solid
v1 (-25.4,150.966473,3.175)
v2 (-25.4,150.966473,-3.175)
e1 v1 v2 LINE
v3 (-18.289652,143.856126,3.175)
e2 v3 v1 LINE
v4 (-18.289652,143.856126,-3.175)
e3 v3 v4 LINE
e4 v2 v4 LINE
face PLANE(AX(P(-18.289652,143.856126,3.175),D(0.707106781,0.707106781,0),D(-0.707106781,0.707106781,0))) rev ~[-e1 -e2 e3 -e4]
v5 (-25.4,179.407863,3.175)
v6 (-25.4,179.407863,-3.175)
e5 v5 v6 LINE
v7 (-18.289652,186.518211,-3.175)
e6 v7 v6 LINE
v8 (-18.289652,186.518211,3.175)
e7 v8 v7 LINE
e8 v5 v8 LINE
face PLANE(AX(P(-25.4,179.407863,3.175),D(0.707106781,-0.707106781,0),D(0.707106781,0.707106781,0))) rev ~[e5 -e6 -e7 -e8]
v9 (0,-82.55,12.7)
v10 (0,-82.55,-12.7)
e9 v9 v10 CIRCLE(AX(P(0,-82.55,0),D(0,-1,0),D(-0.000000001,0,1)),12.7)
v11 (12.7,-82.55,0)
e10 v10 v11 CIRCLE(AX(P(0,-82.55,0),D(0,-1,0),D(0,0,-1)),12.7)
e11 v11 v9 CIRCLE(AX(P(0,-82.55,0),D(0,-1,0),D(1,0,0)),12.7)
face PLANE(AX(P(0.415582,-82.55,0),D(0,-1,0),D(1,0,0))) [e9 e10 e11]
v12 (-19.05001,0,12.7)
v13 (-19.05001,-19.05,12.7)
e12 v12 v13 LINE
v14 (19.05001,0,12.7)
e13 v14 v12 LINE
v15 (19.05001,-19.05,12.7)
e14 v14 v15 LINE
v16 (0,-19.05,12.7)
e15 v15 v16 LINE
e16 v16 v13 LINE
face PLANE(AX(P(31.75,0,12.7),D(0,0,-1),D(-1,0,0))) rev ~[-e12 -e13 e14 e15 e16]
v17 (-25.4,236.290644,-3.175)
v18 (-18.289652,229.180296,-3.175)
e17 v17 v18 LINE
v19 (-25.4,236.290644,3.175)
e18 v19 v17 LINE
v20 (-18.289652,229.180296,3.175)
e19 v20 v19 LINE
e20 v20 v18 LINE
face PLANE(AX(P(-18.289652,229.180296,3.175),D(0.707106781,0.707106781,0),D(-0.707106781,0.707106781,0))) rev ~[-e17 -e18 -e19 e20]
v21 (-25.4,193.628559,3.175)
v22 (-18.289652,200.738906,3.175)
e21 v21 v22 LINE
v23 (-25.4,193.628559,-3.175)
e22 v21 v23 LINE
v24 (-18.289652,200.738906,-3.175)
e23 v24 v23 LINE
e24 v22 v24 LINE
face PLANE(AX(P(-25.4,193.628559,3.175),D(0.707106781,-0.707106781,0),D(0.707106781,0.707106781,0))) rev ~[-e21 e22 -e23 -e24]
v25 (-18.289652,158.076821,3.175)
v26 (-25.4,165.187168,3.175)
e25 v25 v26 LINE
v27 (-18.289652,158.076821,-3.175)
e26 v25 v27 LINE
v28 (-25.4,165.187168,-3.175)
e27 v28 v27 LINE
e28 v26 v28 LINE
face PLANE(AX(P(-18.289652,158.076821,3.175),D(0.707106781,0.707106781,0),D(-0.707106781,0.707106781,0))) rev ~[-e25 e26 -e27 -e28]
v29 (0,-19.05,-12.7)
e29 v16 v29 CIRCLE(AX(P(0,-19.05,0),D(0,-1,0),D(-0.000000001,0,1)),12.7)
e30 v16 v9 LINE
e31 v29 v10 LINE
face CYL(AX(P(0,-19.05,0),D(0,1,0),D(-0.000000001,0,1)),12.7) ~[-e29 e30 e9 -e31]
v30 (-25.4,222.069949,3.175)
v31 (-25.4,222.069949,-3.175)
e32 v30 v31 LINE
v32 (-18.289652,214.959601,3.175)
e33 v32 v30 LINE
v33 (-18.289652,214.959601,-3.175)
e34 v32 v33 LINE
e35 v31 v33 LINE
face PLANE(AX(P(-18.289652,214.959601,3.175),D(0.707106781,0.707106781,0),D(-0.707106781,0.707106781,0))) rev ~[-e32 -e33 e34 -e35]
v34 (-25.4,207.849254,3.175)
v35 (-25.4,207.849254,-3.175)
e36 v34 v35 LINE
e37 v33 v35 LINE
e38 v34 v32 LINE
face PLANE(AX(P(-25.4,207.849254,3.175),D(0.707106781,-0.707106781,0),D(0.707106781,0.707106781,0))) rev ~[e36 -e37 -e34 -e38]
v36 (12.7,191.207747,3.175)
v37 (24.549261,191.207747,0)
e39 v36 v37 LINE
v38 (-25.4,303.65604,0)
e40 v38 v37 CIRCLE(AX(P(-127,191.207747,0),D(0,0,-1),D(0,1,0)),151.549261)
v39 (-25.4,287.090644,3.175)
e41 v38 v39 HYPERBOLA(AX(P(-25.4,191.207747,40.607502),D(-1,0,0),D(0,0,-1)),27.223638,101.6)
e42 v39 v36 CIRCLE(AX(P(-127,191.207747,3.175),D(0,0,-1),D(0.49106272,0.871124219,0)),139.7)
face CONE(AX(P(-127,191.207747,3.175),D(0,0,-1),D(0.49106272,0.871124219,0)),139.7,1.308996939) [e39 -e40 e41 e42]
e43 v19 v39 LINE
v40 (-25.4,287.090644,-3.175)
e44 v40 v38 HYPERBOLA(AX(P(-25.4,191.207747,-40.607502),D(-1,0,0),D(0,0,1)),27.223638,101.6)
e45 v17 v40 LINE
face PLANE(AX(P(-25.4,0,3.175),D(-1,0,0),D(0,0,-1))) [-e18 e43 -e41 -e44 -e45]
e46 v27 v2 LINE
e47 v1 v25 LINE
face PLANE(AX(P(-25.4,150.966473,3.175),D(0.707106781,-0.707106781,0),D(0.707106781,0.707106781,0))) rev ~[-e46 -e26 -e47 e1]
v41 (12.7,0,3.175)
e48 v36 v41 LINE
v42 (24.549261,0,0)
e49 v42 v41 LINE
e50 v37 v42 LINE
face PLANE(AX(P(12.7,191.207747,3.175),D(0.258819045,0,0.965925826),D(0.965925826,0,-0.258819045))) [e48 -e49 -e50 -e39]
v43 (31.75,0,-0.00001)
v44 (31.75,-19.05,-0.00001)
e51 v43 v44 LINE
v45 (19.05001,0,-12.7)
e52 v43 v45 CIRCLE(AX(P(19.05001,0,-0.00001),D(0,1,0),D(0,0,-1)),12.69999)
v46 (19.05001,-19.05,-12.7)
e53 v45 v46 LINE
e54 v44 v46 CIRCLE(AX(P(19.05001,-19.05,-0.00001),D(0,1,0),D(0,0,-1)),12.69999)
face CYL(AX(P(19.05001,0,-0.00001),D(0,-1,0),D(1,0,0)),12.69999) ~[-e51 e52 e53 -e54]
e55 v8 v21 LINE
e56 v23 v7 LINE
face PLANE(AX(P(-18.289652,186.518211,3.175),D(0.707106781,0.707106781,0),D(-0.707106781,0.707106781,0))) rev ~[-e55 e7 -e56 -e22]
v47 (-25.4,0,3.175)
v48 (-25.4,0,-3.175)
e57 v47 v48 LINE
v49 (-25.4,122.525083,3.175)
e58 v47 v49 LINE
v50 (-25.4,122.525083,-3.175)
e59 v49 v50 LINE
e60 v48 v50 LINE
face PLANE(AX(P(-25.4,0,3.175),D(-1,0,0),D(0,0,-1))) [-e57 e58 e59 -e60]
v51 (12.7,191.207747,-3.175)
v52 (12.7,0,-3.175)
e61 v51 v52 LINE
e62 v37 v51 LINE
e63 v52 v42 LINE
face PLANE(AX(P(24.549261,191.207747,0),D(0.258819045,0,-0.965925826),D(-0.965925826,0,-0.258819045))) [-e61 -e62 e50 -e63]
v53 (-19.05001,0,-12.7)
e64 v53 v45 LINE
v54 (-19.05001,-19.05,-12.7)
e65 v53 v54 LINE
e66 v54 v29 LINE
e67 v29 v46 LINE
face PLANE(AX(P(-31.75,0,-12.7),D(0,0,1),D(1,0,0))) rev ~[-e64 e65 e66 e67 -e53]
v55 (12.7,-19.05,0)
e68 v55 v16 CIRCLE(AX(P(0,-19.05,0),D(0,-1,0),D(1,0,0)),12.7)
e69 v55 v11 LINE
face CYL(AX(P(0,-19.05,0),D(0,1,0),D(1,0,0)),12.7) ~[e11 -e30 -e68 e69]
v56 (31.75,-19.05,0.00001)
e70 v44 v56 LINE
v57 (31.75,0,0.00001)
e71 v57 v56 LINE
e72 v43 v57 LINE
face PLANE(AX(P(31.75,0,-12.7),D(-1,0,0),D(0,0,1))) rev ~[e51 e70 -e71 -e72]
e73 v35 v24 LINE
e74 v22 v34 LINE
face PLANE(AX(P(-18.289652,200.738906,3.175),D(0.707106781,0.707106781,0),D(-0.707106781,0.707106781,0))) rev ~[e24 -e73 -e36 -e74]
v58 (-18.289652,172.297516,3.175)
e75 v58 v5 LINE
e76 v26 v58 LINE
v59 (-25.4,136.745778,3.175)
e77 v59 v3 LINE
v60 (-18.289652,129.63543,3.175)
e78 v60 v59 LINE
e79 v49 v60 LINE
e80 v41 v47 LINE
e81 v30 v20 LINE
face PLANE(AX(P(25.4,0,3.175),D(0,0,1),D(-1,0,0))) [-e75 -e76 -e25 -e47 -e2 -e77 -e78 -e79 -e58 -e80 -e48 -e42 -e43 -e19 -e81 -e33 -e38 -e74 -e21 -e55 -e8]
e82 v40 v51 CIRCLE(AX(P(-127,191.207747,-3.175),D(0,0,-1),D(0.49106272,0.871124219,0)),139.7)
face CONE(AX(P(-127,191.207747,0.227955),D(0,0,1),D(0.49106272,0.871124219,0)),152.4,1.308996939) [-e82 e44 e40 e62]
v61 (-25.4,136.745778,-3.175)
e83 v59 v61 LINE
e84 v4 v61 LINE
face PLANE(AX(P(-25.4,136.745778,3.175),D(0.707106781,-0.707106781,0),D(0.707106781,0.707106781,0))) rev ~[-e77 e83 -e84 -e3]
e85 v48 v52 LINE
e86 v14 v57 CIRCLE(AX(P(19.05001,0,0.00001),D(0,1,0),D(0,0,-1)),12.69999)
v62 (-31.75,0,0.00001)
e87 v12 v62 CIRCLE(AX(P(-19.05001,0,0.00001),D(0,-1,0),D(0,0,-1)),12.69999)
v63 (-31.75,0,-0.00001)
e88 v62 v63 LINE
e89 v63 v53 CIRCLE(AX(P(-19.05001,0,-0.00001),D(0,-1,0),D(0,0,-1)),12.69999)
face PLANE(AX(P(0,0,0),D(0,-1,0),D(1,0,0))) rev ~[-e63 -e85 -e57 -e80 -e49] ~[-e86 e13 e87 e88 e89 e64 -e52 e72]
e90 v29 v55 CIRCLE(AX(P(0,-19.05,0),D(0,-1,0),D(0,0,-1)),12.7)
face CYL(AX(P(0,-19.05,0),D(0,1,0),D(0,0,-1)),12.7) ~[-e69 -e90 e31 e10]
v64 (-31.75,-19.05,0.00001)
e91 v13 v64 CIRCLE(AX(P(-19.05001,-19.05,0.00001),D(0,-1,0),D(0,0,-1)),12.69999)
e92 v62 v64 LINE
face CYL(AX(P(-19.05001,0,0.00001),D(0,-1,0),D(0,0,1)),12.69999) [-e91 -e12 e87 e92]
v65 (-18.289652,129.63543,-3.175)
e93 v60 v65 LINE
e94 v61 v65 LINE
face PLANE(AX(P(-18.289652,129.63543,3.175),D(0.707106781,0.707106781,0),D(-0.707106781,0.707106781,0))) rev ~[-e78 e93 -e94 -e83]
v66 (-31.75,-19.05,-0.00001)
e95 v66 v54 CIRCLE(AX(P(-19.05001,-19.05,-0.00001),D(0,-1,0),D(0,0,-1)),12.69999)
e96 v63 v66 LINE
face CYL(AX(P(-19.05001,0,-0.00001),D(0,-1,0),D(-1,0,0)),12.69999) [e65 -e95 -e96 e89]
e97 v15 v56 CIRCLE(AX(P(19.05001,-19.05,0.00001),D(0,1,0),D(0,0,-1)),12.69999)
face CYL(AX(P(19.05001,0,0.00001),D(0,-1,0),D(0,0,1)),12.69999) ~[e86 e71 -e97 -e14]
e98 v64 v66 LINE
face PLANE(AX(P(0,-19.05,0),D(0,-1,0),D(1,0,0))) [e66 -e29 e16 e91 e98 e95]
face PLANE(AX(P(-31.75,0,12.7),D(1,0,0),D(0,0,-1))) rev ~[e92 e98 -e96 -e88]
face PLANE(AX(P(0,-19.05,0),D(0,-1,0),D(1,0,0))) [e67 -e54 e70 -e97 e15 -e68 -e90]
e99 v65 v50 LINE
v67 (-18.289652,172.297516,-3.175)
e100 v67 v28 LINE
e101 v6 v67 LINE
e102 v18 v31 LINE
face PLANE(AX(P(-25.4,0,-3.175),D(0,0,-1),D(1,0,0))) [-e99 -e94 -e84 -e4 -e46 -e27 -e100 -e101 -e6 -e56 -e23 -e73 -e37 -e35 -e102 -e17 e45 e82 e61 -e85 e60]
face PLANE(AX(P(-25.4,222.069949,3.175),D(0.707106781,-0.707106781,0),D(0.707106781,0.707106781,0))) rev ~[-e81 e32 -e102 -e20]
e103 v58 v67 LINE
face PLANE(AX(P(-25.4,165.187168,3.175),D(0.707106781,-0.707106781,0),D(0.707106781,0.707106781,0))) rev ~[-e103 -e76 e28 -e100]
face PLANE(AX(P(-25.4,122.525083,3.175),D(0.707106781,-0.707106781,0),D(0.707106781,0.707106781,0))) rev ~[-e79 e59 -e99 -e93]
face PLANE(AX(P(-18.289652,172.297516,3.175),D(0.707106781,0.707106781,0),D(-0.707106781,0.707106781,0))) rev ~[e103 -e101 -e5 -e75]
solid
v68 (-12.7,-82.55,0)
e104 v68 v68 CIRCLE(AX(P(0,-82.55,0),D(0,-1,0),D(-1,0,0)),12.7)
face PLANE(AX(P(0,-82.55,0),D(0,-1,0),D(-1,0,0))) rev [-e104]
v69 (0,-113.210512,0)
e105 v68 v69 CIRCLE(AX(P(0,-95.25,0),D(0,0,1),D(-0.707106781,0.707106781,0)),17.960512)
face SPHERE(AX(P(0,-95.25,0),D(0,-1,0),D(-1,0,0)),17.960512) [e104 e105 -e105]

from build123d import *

# Parameters (mm, degrees)
F1_DEPTH    = 304.8
F2_T1_DEPTH = 574.3112662849
F3_T1_DEPTH = 224.1861106845
F3_T4_ANGLE = 60.5895449389
F3_T6_ANGLE = 60.5895449389
F5_DEPTH    = 19.05
F7_DEPTH    = 63.5
F8_R        = 12.69999
F12_DEPTH   = 25.4


# Not quite as in the source:
# - a fillet or chamfer that OpenCascade refuses, or shapes differently, is made with other operations: its cross-section is extruded or revolved along the edge and cut away or added
# - a fillet or chamfer is up to 0.001 mm smaller than in the source, because OpenCascade refuses the exact size


with BuildPart() as f1:
    # F0 (on Front) → F1 (new body)
    with BuildSketch(Plane.XZ):
        Polygon((-25.4, 0), (0, 0), (25.4, 0), (25.4, 3.175), (-25.4, 3.175), align=None)
        Polygon((25.4, 0), (0, 0), (-25.4, 0), (-25.4, -3.175), (25.4, -3.175), align=None)
    extrude(amount=-F1_DEPTH)

    # F2: fillet of radius 152.4 on 1 edges, made by hand

    # F2_s2 → F2_t1 (cut)
    with BuildSketch(Plane.XY.offset(-287.1556331425)):
        with BuildLine():
            ThreePointArc((25.4, 191.207746743), (12.1215296063, 253.4247862097), (-25.4, 304.8))
            Line((-25.4, 304.8), (25.4, 304.8))
            Line((25.4, 304.8), (25.4, 191.207746743))
        make_face()
    extrude(amount=F2_T1_DEPTH, mode=Mode.SUBTRACT)

    # F3: chamfer of 12.7 x 3.4029547439 on 4 edges, made by hand

    # F3_s2 → F3_t1 (cut)
    with BuildSketch(Plane.XZ.offset(-191.207746743)):
        Polygon((12.7, 3.175), (25.4, -0.2279547439), (25.4, 3.175), align=None)
        Polygon((25.4, 0.2279547439), (12.7, -3.175), (25.4, -3.175), align=None)
    extrude(amount=F3_T1_DEPTH, mode=Mode.SUBTRACT)

    # F3_s3 → F3_t4 (revolve, cut)
    with BuildSketch(Plane(origin=(-178.1690956727, 100.4359641468, 0), x_dir=(0, 0, 1), z_dir=(-0.8711242188, 0.4910627204, 0))):
        Polygon((3.175, 243.9007335274), (-0.2279547439, 256.6007335274), (3.175, 256.6007335274), align=None)
    revolve(axis=Axis((-127.0000000001, 191.207746743, 3.175), (0, 0, -1)), revolution_arc=F3_T4_ANGLE, mode=Mode.SUBTRACT)

    # F3_s5 → F3_t6 (revolve, cut)
    with BuildSketch(Plane(origin=(-178.1690956727, 100.4359641468, 0), x_dir=(0, 0, 1), z_dir=(-0.8711242188, 0.4910627204, 0))):
        Polygon((0.2279547439, 256.6007335274), (-3.175, 243.9007335274), (-3.175, 256.6007335274), align=None)
    revolve(axis=Axis((-127.0000000001, 191.207746743, -3.175), (0, 0, -1)), revolution_arc=F3_T6_ANGLE, mode=Mode.SUBTRACT)

    # F4 (on face) → F5 (join)
    with BuildSketch(Plane.XZ):
        Polygon((31.75, 12.7), (0, 12.7), (-31.75, 12.7), (-31.75, -12.7), (0, -12.7), (31.75, -12.7), align=None)
        Polygon((-25.4, 3.175), (0, 3.175), (12.7, 3.175), (24.5492613139, 0), (12.7, -3.175), (-25.4, -3.175), align=None, mode=Mode.SUBTRACT)
        Polygon((12.7, 3.175), (0, 3.175), (-25.4, 3.175), (-25.4, -3.175), (12.7, -3.175), (24.5492613139, 0), align=None)
    extrude(amount=F5_DEPTH)

    # F6 (on face) → F7 (join)
    with BuildSketch(Plane.XZ.offset(19.05)):
        with BuildLine():
            ThreePointArc((0, -12.7), (8.9802561211, -8.9802561211), (12.7, 0))
            ThreePointArc((12.7, 0), (8.980256117, 8.9802561251), (-1.15e-08, 12.7))
            ThreePointArc((-1.15e-08, 12.7), (-12.7, -5.7e-09), (0, -12.7))
        make_face()
    extrude(amount=F7_DEPTH)

    # F8 (radius 12.7 in the source; OpenCascade refuses exactly that, so slightly less here)
    f8_edges = [f1.edges().sort_by_distance(p)[0] for p in [
        (-31.75, -9.525, 12.7),
        (31.75, -9.525, 12.7),
        (31.75, -9.525, -12.7),
        (-31.75, -9.525, -12.7),
    ]]
    fillet(f8_edges, radius=F8_R)

    # F11 (on face) → F12 (cut)
    with BuildSketch(Plane.XY.offset(3.175)):
        Polygon((-18.2896524204, 229.1802964913), (-25.4, 236.2906440709), (-25.4, 222.0699489117), align=None)
        Polygon((-18.2896524204, 214.959601332), (-25.4, 222.0699489117), (-25.4, 207.8492537524), align=None)
        Polygon((-18.2896524204, 200.7389061727), (-25.4, 207.8492537524), (-25.4, 193.6285585931), align=None)
        Polygon((-18.2896524204, 186.5182110135), (-25.4, 193.6285585931), (-25.4, 179.4078634338), align=None)
        Polygon((-18.2896524204, 172.2975158542), (-25.4, 179.4078634338), (-25.4, 165.1871682745), align=None)
        Polygon((-18.2896524204, 158.0768206949), (-25.4, 165.1871682745), (-25.4, 150.9664731153), align=None)
        Polygon((-25.4, 150.9664731153), (-25.4, 136.745777956), (-18.2896524204, 143.8561255356), align=None)
        Polygon((-25.4, 136.745777956), (-25.4, 122.5250827967), (-18.2896524204, 129.6354303763), align=None)
    extrude(amount=-F12_DEPTH, mode=Mode.SUBTRACT)


with BuildPart() as f10:
    # F9 (on Top) → F10 (revolve)
    with BuildSketch(Plane.XY):
        with BuildLine():
            Line((0, -113.2105122421), (0, -82.55))
            Line((0, -82.55), (-12.7, -82.55))
            ThreePointArc((-12.7, -82.55), (-16.5933496539, -102.1231904719), (0, -113.2105122421))
        make_face()
    revolve(axis=Axis((0, -97.8802561211, 0), (0, -1, 0)))


solid = Compound([f1.part, f10.part])
